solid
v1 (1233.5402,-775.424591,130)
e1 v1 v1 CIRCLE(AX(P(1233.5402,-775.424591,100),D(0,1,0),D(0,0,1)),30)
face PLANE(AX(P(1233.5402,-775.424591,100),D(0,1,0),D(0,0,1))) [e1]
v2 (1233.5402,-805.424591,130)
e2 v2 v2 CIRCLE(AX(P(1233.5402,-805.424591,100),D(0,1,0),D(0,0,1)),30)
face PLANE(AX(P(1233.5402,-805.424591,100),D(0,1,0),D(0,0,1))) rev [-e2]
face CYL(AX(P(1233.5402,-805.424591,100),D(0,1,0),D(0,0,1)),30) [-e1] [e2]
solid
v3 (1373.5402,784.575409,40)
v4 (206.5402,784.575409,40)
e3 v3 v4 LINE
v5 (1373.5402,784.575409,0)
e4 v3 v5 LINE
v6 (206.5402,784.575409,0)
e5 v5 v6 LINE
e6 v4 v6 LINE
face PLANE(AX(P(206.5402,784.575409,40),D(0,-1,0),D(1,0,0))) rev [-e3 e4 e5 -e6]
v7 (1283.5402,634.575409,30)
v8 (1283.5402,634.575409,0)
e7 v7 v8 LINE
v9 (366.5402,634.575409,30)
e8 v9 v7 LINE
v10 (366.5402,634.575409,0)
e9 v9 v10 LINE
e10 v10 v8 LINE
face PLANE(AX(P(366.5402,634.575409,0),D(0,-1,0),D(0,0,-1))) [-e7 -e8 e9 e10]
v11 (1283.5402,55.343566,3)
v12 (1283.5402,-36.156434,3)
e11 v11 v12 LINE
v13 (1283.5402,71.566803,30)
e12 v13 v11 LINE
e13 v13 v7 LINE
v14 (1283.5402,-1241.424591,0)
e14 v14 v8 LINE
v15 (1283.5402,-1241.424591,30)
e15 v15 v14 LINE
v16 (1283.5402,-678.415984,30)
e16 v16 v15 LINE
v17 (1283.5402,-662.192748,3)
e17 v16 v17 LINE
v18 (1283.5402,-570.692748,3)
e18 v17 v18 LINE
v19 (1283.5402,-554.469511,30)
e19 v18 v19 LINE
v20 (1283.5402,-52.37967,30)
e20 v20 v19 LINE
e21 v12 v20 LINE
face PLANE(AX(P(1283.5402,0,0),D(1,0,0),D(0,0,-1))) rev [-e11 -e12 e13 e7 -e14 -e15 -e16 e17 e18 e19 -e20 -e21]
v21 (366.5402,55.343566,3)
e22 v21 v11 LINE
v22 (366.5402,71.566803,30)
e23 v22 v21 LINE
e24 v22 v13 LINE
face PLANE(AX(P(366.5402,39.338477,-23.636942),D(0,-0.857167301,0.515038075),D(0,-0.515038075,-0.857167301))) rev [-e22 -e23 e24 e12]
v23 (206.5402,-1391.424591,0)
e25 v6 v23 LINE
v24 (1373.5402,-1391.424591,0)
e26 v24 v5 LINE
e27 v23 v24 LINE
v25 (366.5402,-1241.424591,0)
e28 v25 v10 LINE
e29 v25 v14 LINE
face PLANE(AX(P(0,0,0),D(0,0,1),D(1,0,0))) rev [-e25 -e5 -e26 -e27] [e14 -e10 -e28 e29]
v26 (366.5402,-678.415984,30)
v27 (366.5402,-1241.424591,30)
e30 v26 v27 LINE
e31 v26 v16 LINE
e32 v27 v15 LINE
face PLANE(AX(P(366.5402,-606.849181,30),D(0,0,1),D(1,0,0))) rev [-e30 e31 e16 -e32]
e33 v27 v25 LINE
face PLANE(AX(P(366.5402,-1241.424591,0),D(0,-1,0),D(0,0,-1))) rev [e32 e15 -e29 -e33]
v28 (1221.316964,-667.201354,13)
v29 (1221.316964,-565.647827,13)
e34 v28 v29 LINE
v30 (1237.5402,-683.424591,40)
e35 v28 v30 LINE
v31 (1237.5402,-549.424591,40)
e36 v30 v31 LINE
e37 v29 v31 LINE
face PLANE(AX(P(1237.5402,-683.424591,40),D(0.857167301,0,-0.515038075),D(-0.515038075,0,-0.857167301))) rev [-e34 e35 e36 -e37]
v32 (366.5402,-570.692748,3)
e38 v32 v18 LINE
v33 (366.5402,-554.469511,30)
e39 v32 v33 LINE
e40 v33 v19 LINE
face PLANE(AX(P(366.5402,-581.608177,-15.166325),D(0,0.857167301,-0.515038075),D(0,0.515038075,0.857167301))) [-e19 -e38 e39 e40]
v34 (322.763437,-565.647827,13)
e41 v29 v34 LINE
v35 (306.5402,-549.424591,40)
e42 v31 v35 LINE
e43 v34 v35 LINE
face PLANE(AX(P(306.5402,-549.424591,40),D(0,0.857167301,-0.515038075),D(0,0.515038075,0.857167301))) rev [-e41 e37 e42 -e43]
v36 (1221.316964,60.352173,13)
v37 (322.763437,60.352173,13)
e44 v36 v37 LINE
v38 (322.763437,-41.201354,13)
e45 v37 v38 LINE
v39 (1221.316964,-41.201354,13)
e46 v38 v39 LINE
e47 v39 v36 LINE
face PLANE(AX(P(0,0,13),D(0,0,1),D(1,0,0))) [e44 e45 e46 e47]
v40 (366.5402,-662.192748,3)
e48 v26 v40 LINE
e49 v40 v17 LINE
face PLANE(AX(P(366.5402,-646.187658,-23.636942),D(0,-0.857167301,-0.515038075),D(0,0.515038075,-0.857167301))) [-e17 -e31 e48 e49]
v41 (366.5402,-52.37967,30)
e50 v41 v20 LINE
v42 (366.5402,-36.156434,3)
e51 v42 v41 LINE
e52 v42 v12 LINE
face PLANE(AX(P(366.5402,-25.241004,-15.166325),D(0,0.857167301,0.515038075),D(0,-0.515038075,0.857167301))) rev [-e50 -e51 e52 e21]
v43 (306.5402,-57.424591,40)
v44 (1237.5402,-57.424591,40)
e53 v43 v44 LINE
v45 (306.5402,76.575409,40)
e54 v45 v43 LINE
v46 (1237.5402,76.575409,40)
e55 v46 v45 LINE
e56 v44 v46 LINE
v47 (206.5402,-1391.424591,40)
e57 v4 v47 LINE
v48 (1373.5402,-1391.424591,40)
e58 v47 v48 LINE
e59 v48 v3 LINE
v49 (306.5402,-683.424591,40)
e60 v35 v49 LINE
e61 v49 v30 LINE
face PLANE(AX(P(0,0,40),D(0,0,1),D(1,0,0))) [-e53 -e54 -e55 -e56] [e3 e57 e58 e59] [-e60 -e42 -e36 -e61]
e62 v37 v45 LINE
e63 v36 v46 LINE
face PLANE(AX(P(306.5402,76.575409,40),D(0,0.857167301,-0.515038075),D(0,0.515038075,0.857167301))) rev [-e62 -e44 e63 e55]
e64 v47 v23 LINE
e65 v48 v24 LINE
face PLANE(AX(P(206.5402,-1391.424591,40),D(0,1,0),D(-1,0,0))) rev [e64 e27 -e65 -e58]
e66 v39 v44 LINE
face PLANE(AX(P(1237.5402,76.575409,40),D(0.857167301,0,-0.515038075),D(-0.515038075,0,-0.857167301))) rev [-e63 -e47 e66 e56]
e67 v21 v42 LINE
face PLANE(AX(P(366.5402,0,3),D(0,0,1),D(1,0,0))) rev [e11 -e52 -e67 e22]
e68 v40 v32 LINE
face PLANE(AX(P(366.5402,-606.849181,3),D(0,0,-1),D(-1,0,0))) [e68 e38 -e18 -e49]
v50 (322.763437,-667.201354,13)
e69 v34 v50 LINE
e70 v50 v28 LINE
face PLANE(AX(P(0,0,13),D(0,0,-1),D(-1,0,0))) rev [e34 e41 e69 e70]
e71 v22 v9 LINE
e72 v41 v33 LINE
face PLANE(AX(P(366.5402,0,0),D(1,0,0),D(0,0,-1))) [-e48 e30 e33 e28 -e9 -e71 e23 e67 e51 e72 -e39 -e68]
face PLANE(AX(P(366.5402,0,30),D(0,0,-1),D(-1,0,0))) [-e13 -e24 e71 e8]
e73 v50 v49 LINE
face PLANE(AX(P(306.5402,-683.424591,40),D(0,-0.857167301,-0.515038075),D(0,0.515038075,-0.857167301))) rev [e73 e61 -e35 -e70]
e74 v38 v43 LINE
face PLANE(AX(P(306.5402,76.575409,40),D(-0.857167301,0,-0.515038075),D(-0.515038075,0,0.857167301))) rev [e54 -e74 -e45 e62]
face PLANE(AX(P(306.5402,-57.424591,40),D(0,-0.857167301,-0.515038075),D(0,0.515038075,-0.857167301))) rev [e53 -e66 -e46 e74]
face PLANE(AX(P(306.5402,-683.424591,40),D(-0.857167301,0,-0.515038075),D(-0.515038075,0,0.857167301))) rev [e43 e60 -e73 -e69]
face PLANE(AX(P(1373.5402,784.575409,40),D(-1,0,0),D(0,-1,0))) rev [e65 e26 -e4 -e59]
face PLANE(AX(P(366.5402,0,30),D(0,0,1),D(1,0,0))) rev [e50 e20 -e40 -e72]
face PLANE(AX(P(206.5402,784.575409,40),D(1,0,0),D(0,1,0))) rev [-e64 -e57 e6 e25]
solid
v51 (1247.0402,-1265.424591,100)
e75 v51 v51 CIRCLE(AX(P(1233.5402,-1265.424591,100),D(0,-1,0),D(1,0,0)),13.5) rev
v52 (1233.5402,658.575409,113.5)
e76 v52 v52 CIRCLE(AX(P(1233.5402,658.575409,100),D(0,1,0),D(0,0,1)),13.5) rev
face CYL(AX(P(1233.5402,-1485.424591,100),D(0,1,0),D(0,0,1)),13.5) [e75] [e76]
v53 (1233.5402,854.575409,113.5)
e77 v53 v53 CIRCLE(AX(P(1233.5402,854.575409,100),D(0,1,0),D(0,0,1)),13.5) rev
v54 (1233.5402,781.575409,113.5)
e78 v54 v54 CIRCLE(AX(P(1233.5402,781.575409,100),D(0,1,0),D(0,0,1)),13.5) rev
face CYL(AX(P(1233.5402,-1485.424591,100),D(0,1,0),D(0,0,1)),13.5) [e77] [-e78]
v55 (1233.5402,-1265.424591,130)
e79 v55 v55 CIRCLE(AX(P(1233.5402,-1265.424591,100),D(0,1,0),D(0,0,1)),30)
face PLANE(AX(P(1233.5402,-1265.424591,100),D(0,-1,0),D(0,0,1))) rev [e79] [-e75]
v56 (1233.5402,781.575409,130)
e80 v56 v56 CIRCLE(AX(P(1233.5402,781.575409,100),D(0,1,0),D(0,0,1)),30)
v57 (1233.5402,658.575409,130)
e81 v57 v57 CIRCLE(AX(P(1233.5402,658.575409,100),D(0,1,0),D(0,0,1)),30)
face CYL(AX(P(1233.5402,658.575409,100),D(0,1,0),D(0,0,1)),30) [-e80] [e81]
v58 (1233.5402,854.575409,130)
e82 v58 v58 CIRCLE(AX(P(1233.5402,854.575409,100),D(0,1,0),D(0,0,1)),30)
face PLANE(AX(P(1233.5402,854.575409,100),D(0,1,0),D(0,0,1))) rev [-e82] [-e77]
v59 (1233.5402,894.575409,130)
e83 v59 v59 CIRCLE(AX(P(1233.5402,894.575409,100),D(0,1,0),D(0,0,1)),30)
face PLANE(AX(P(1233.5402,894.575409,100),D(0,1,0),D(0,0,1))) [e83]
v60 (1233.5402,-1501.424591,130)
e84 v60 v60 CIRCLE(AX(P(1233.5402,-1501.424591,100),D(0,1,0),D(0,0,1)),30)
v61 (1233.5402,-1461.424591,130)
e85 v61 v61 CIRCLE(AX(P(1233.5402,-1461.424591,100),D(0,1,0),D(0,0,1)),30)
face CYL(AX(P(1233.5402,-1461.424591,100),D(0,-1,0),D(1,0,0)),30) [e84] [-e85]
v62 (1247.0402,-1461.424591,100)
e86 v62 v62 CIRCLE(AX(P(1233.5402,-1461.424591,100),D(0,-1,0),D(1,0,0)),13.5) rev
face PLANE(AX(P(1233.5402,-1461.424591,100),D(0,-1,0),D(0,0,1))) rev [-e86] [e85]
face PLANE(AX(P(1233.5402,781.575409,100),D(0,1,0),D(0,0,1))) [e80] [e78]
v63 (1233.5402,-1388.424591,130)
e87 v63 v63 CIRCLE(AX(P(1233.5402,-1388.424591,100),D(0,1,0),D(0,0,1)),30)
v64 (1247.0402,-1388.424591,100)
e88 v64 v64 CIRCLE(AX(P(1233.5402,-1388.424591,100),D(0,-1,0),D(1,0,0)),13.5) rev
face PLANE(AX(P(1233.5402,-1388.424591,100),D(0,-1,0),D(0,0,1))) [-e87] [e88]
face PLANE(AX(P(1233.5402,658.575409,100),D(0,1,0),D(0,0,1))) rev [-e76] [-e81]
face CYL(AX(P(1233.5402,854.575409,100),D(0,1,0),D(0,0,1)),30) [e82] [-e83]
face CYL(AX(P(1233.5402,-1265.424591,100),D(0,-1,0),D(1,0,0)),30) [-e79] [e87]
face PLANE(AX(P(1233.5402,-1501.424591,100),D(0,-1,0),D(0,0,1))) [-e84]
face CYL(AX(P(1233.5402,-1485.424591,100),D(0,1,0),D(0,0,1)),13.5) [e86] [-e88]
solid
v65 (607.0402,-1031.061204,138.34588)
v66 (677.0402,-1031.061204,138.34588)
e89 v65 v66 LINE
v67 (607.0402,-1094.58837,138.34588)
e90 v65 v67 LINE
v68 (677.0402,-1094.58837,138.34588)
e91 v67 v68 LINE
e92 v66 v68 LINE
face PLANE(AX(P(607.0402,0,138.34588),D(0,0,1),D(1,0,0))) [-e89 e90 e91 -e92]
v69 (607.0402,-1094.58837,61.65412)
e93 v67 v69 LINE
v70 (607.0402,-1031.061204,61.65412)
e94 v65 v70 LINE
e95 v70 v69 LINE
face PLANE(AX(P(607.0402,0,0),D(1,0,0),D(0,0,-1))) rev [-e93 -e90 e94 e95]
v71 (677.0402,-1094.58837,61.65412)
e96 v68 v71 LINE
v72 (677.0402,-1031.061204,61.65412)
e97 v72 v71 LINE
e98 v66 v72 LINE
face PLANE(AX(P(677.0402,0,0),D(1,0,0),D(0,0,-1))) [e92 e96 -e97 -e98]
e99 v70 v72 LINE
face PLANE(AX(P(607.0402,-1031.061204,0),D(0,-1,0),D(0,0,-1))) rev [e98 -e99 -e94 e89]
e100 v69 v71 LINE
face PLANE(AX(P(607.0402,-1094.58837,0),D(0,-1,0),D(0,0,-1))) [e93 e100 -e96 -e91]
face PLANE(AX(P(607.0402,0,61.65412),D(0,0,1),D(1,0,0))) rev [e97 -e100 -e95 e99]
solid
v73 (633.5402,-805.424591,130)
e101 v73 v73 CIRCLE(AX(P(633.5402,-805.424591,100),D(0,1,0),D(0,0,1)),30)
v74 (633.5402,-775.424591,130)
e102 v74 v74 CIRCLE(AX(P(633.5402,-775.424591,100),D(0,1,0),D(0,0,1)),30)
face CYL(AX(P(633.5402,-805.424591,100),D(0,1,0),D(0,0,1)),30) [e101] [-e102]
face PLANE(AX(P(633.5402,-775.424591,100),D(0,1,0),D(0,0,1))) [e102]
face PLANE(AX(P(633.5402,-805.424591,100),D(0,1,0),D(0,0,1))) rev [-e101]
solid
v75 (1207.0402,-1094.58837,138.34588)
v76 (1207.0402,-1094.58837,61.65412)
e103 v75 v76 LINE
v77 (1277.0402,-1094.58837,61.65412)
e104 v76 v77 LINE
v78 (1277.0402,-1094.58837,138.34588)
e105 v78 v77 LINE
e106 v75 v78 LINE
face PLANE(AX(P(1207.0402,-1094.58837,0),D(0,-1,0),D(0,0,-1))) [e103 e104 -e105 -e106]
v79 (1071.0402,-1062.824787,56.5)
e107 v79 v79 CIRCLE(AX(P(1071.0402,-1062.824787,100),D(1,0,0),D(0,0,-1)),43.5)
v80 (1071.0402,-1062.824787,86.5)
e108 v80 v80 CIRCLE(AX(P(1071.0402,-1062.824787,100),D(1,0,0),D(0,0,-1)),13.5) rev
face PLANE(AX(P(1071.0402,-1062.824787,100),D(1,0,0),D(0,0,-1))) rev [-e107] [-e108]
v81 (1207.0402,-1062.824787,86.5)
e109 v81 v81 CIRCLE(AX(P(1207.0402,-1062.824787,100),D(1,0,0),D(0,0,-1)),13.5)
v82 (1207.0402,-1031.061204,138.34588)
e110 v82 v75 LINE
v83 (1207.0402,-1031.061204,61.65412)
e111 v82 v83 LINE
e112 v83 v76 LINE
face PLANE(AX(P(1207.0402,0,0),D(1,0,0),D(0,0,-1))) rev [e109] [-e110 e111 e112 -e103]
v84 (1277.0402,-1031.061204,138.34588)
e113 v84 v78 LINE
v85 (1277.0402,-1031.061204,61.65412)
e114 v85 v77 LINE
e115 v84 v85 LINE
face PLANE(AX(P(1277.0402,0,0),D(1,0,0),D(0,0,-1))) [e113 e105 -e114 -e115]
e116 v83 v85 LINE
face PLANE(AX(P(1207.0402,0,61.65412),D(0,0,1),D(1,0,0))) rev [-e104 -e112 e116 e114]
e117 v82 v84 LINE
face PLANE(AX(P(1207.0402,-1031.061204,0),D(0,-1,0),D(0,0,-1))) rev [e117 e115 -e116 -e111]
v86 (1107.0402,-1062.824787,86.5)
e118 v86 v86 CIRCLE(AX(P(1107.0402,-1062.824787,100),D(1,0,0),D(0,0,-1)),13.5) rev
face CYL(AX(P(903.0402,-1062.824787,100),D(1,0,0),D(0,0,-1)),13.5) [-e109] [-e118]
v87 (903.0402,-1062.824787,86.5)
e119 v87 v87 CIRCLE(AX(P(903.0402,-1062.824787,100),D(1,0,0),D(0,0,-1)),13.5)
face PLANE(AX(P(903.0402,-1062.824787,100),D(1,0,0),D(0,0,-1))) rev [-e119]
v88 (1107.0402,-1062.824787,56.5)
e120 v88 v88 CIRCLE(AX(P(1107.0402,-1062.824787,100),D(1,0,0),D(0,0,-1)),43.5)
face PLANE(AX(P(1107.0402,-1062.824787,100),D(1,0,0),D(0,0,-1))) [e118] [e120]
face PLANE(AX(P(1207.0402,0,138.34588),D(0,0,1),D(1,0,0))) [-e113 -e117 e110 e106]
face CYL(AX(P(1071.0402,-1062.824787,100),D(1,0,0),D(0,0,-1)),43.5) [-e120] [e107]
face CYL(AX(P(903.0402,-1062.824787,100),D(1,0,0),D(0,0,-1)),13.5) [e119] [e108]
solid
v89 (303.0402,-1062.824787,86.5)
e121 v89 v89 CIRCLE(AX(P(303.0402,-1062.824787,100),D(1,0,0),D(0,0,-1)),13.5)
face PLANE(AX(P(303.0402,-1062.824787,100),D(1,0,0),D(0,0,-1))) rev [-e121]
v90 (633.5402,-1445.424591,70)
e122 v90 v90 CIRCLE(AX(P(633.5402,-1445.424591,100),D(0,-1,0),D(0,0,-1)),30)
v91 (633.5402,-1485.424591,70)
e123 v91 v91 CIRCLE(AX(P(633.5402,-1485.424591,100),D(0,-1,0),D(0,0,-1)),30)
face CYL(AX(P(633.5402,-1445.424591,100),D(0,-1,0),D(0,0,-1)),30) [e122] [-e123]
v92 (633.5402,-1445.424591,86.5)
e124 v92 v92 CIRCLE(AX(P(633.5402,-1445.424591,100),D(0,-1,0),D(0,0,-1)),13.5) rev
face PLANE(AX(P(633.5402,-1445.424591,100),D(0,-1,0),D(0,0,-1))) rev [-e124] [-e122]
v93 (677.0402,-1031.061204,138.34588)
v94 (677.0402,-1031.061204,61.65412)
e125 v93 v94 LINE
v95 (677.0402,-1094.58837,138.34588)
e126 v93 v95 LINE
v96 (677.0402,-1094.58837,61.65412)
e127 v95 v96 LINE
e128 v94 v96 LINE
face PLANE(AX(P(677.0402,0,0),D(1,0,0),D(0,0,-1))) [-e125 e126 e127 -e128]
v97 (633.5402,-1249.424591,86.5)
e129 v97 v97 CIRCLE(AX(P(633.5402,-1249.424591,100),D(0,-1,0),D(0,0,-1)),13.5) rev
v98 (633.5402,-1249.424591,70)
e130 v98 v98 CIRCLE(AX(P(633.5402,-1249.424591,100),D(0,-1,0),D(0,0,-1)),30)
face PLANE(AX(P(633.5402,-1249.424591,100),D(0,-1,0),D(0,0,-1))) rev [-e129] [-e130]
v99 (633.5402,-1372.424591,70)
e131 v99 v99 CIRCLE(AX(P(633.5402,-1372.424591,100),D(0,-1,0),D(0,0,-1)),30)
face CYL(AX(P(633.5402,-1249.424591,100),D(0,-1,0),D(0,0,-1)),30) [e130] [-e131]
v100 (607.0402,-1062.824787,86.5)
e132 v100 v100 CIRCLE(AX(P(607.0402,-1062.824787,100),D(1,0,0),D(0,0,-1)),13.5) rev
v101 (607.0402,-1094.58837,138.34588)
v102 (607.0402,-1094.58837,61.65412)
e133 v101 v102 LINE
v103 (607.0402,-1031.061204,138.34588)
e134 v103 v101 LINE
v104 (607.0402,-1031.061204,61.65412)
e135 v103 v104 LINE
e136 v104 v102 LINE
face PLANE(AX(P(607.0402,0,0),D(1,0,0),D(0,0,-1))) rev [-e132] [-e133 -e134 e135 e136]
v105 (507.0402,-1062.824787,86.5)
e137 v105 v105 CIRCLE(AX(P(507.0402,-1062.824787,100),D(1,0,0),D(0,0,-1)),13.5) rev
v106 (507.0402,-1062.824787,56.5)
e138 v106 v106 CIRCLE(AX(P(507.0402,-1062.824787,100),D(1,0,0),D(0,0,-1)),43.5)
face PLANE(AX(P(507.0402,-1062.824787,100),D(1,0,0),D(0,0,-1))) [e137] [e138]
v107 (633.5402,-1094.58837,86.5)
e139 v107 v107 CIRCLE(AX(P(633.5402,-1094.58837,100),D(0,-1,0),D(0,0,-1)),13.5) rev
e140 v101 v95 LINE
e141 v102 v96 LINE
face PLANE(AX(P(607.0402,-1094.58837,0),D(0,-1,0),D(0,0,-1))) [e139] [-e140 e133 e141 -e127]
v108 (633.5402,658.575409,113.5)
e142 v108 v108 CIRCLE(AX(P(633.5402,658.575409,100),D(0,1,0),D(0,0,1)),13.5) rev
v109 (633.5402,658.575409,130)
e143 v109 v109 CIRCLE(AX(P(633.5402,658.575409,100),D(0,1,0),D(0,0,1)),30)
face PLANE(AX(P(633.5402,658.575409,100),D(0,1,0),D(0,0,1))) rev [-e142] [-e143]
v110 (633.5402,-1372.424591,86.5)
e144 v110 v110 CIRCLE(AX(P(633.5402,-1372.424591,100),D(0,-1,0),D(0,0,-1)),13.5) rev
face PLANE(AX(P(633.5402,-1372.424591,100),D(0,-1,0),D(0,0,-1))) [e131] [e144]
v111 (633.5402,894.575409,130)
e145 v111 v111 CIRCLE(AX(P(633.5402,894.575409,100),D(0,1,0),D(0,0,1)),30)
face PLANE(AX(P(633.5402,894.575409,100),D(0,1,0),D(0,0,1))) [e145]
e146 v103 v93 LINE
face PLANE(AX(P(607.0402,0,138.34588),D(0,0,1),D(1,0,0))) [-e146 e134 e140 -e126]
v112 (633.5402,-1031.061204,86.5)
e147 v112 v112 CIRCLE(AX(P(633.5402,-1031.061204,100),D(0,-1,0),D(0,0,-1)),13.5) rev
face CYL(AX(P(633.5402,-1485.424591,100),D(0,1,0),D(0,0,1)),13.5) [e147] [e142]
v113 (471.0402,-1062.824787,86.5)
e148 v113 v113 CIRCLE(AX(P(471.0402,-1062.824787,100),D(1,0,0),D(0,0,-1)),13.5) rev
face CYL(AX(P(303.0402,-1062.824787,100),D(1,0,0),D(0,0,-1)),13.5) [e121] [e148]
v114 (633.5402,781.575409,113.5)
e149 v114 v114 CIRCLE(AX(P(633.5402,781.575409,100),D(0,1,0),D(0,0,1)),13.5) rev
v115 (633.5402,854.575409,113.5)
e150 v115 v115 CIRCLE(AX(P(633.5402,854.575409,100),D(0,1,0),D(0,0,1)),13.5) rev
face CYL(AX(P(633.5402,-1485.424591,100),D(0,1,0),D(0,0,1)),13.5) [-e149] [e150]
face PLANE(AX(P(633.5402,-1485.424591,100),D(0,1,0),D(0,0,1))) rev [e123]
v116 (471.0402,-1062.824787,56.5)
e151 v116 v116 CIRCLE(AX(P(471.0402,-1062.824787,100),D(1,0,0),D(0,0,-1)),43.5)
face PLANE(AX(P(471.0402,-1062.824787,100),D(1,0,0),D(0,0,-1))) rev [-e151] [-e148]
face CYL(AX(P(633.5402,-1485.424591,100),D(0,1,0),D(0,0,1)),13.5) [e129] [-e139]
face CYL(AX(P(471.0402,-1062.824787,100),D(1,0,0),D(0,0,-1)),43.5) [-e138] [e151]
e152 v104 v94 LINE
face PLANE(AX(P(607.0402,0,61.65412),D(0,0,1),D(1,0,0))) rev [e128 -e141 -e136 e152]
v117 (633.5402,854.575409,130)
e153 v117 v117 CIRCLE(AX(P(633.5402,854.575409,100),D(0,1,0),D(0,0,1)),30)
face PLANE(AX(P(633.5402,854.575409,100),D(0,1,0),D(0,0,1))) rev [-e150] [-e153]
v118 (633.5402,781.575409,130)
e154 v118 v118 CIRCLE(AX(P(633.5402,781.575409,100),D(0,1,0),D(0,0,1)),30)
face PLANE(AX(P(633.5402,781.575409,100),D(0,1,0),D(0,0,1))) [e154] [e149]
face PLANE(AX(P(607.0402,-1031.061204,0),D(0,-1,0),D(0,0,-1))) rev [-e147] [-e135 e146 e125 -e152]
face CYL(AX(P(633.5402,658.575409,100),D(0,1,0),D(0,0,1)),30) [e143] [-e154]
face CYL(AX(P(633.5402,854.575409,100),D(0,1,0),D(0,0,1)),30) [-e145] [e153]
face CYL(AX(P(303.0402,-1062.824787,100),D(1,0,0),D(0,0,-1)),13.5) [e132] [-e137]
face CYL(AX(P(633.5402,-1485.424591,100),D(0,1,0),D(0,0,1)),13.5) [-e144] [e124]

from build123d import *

# Parameters (mm, degrees)
SKETCH1_W                    = 1167
SKETCH1_H                    = 2176
BOSS_EXTRUDE1_DEPTH          = 40
SKETCH2_W                    = 931
SKETCH2_H                    = 134
CUT_EXTRUDE1_DEPTH           = 27
CUT_EXTRUDE1_DRAFT           = -31
CUT_EXTRUDE1_PROFILE_2_DEPTH = 27
CUT_EXTRUDE1_PROFILE_2_DRAFT = -31
CUT_EXTRUDE2_START           = -90
CUT_EXTRUDE2_DEPTH           = 917
BOSS_EXTRUDE2_START          = 110
SKETCH4_R                    = 13.5
BOSS_EXTRUDE2_DEPTH          = 2380
SKETCH5_R                    = 30
BOSS_EXTRUDE3_DEPTH          = 40
BOSS_EXTRUDE4_START          = -113
SKETCH6_R                    = 30
BOSS_EXTRUDE4_DEPTH          = 123
BOSS_EXTRUDE5_START          = -40
SKETCH8_W                    = 76.691760354
SKETCH8_H                    = 63.527166665
BOSS_EXTRUDE5_DEPTH          = 70
SKETCH9_R                    = 13.5
BOSS_EXTRUDE6_DEPTH          = 344
BOSS_EXTRUDE7_START          = -140
SKETCH10_R                   = 43.5
BOSS_EXTRUDE7_DEPTH          = 36
BOSS_EXTRUDE8_START          = -1670
SKETCH11_R                   = 30
BOSS_EXTRUDE8_DEPTH          = 30
LPATTERN2_COUNT              = 2
LPATTERN2_PITCH              = 600
LPATTERN3_START              = -805.424590627
LPATTERN3_OUTLINE_R          = 30
LPATTERN3_DEPTH              = 30
LPATTERN3_START_2            = 61.654119823
LPATTERN3_2_OUTLINE_W        = 70
LPATTERN3_2_OUTLINE_H        = 63.527166665
LPATTERN3_2_DEPTH            = 76.691760354
LPATTERN3_START_3            = 658.575409373
LPATTERN3_3_OUTLINE_R        = 30
LPATTERN3_3_DEPTH            = 123
LPATTERN3_START_4            = 854.575409373
LPATTERN3_4_OUTLINE_R        = 30
LPATTERN3_4_DEPTH            = 40
LPATTERN3_START_5            = 607.040200233
LPATTERN3_5_OUTLINE_W        = 63.527166665
LPATTERN3_5_OUTLINE_H        = 76.691760354
LPATTERN3_5_DEPTH            = 70
LPATTERN3_START_6            = 471.040200233
LPATTERN3_6_OUTLINE_R        = 43.5
LPATTERN3_6_DEPTH            = 36
LPATTERN3_START_7            = 303.040200233
LPATTERN3_7_OUTLINE_R        = 13.5
LPATTERN3_7_DEPTH            = 304
SKETCH12_R                   = 30
BOSS_EXTRUDE9_DEPTH          = 40
BOSS_EXTRUDE10_START         = -113
SKETCH13_R                   = 30
BOSS_EXTRUDE10_DEPTH         = 123


# Read off the part's stored shape, not the designer's step: LPattern3
with BuildPart() as part:
    # Sketch1 → Boss-Extrude1 (new body)
    with BuildSketch(Plane.XY):
        with Locations((790.040200233, -303.424590627)):
            Rectangle(SKETCH1_W, SKETCH1_H)
    extrude(amount=BOSS_EXTRUDE1_DEPTH)


with BuildPart() as cut_extrude1_tool:
    # Sketch2 → Cut-Extrude1 (with draft: the straight prism first)
    with BuildSketch(Plane.XY.offset(40)):
        with Locations((772.040200233, 9.575409373)):
            Rectangle(SKETCH2_W, SKETCH2_H)
    extrude(amount=-CUT_EXTRUDE1_DEPTH)
    # Cut-Extrude1: the draft: its side faces are tilted about the plane it starts from
    cut_extrude1_sides = [cut_extrude1_tool.faces().sort_by_distance(p)[0] for p in [
        (306.540200233, 9.575409373, 26.5),
        (772.040200233, -57.424590627, 26.5),
        (1237.540200233, 9.575409373, 26.5),
        (772.040200233, 76.575409373, 26.5),
    ]]
    draft(cut_extrude1_sides, Plane.XY.offset(40), CUT_EXTRUDE1_DRAFT)


with BuildPart() as part_1:
    add(part.part)

    # Cut-Extrude1: cut by cut_extrude1_tool
    add(cut_extrude1_tool.part, mode=Mode.SUBTRACT)


with BuildPart() as cut_extrude1_profile_2_tool:
    # Sketch2 → Cut-Extrude1 profile 2 (with draft: the straight prism first)
    with BuildSketch(Plane.XY.offset(40)):
        with Locations((772.040200233, -616.424590627)):
            Rectangle(SKETCH2_W, SKETCH2_H)
    extrude(amount=-CUT_EXTRUDE1_PROFILE_2_DEPTH)
    # Cut-Extrude1 profile 2: the draft: its side faces are tilted about the plane it starts from
    cut_extrude1_profile_2_sides = [cut_extrude1_profile_2_tool.faces().sort_by_distance(p)[0] for p in [
        (306.540200233, -616.424590627, 26.5),
        (772.040200233, -683.424590627, 26.5),
        (1237.540200233, -616.424590627, 26.5),
        (772.040200233, -549.424590627, 26.5),
    ]]
    draft(cut_extrude1_profile_2_sides, Plane.XY.offset(40), CUT_EXTRUDE1_PROFILE_2_DRAFT)


with BuildPart() as part_2:
    add(part_1.part)

    # Cut-Extrude1 profile 2: cut by cut_extrude1_profile_2_tool
    add(cut_extrude1_profile_2_tool.part, mode=Mode.SUBTRACT)

    # Sketch3 → Cut-Extrude2 (cut)
    with BuildSketch(Plane(origin=(1373.540200233, 0, 0), x_dir=(0, 0, -1), z_dir=(1, 0, 0)).offset(CUT_EXTRUDE2_START)):
        Polygon((-30, 634.575409373), (-30, 71.566803182), (-3, 55.343566469), (-3, -36.156433531), (-30, -52.379670245), (-30, -340.424590627), (0, -340.424590627), (0, 634.575409373), align=None)
    cut_extrude2 = extrude(amount=-CUT_EXTRUDE2_DEPTH, mode=Mode.SUBTRACT)

    # Mirror1: Cut-Extrude2 across plane
    add(cut_extrude2.mirror(Plane.ZX.offset(-303.424590627)), mode=Mode.SUBTRACT)


with BuildPart() as body_2:
    # Sketch4 → Boss-Extrude2 (new body)
    with BuildSketch(Plane(origin=(0, 784.575409373, 0), x_dir=(1, 0, 0), z_dir=(0, 1, 0)).offset(BOSS_EXTRUDE2_START)):
        with Locations(Location((1233.540200233, -100, 0), (0, 0, 270))):
            Circle(SKETCH4_R)
    boss_extrude2 = extrude(amount=-BOSS_EXTRUDE2_DEPTH)

    # Sketch5 → Boss-Extrude3 (add)
    with BuildSketch(Plane(origin=(0, 894.575409373, 0), x_dir=(1, 0, 0), z_dir=(0, 1, 0))):
        with Locations(Location((1233.540200233, -100, 0), (0, 0, 270))):
            Circle(SKETCH5_R)
    boss_extrude3 = extrude(amount=-BOSS_EXTRUDE3_DEPTH)

    # Sketch6 → Boss-Extrude4 (add)
    with BuildSketch(Plane(origin=(0, 894.575409373, 0), x_dir=(1, 0, 0), z_dir=(0, 1, 0)).offset(BOSS_EXTRUDE4_START)):
        with Locations(Location((1233.540200233, -100, 0), (0, 0, 270))):
            Circle(SKETCH6_R)
    boss_extrude4 = extrude(amount=-BOSS_EXTRUDE4_DEPTH)

    # Mirror2: Boss-Extrude3, Boss-Extrude4 across plane
    add(boss_extrude3.mirror(Plane.ZX.offset(-303.424590627)))
    add(boss_extrude4.mirror(Plane.ZX.offset(-303.424590627)))


with BuildPart() as body_3:
    # Sketch8 → Boss-Extrude5 (new body)
    with BuildSketch(Plane(origin=(1247.040200233, 0, 0), x_dir=(0, 0, -1), z_dir=(1, 0, 0)).offset(BOSS_EXTRUDE5_START)):
        with Locations((-100, -1062.824787132)):
            Rectangle(SKETCH8_W, SKETCH8_H)
    extrude(amount=BOSS_EXTRUDE5_DEPTH)

    # Sketch9 → Boss-Extrude6 (add)
    with BuildSketch(Plane(origin=(1247.040200233, 0, 0), x_dir=(0, 0, -1), z_dir=(1, 0, 0))):
        with Locations((-100, -1062.824787132)):
            Circle(SKETCH9_R)
    extrude(amount=-BOSS_EXTRUDE6_DEPTH)

    # Sketch10 → Boss-Extrude7 (add)
    with BuildSketch(Plane(origin=(1247.040200233, 0, 0), x_dir=(0, 0, -1), z_dir=(1, 0, 0)).offset(BOSS_EXTRUDE7_START)):
        with Locations((-100, -1062.824787132)):
            Circle(SKETCH10_R)
    extrude(amount=-BOSS_EXTRUDE7_DEPTH)


with BuildPart() as body_4:
    # Sketch11 → Boss-Extrude8 (new body)
    with BuildSketch(Plane(origin=(0, 894.575409373, 0), x_dir=(1, 0, 0), z_dir=(0, 1, 0)).offset(BOSS_EXTRUDE8_START)):
        with Locations(Location((1233.540200233, -100, 0), (0, 0, 270))):
            Circle(SKETCH11_R)
    extrude(amount=-BOSS_EXTRUDE8_DEPTH)


with BuildPart() as lpattern2_1:
    # LPattern2: Boss-Extrude2 ×2
    with Locations(*[(-i * LPATTERN2_PITCH, 0, 0) for i in range(1, LPATTERN2_COUNT)]):
        add(boss_extrude2)

    # LPattern3 3 outline → LPattern3 3 (add)
    with BuildSketch(Plane(origin=(0, 0, 0), x_dir=(1, 0, 0), z_dir=(0, 1, 0)).offset(LPATTERN3_START_3)):
        with Locations((633.540200233, -100)):
            Circle(LPATTERN3_3_OUTLINE_R)
    extrude(amount=LPATTERN3_3_DEPTH)

    # LPattern3 4 outline → LPattern3 4 (add)
    with BuildSketch(Plane(origin=(0, 0, 0), x_dir=(1, 0, 0), z_dir=(0, 1, 0)).offset(LPATTERN3_START_4)):
        with Locations((633.540200233, -100)):
            Circle(LPATTERN3_4_OUTLINE_R)
    extrude(amount=LPATTERN3_4_DEPTH)

    # LPattern3 5 outline → LPattern3 5 (add)
    with BuildSketch(Plane.YZ.offset(LPATTERN3_START_5)):
        with Locations((-1062.824787132, 100)):
            Rectangle(LPATTERN3_5_OUTLINE_W, LPATTERN3_5_OUTLINE_H)
    extrude(amount=LPATTERN3_5_DEPTH)

    # LPattern3 6 outline → LPattern3 6 (add)
    with BuildSketch(Plane.YZ.offset(LPATTERN3_START_6)):
        with Locations((-1062.824787132, 100)):
            Circle(LPATTERN3_6_OUTLINE_R)
    extrude(amount=LPATTERN3_6_DEPTH)

    # LPattern3 7 outline → LPattern3 7 (add)
    with BuildSketch(Plane.YZ.offset(LPATTERN3_START_7)):
        with Locations((-1062.824787132, 100)):
            Circle(LPATTERN3_7_OUTLINE_R)
    extrude(amount=LPATTERN3_7_DEPTH)

    # Sketch12 → Boss-Extrude9 (add)
    with BuildSketch(Plane(origin=(0, -1485.424590627, 0), x_dir=(-1, 0, 0), z_dir=(0, -1, 0))):
        with Locations(Location((-633.540200233, -100, 0), (0, 0, 270))):
            Circle(SKETCH12_R)
    extrude(amount=-BOSS_EXTRUDE9_DEPTH)

    # Sketch13 → Boss-Extrude10 (add)
    with BuildSketch(Plane(origin=(0, -1485.424590627, 0), x_dir=(-1, 0, 0), z_dir=(0, -1, 0)).offset(BOSS_EXTRUDE10_START)):
        with Locations(Location((-633.540200233, -100, 0), (0, 0, 270))):
            Circle(SKETCH13_R)
    extrude(amount=-BOSS_EXTRUDE10_DEPTH)


with BuildPart() as body_6:
    # LPattern3 outline → LPattern3 (new body)
    with BuildSketch(Plane(origin=(0, 0, 0), x_dir=(1, 0, 0), z_dir=(0, 1, 0)).offset(LPATTERN3_START)):
        with Locations((633.540200233, -100)):
            Circle(LPATTERN3_OUTLINE_R)
    extrude(amount=LPATTERN3_DEPTH)


with BuildPart() as body_7:
    # LPattern3 2 outline → LPattern3 2 (new body)
    with BuildSketch(Plane.XY.offset(LPATTERN3_START_2)):
        with Locations((642.040200233, -1062.824787132)):
            Rectangle(LPATTERN3_2_OUTLINE_W, LPATTERN3_2_OUTLINE_H)
    extrude(amount=LPATTERN3_2_DEPTH)


solid = Compound([part_2.part, body_2.part, body_3.part, body_4.part, lpattern2_1.part, body_6.part, body_7.part])
